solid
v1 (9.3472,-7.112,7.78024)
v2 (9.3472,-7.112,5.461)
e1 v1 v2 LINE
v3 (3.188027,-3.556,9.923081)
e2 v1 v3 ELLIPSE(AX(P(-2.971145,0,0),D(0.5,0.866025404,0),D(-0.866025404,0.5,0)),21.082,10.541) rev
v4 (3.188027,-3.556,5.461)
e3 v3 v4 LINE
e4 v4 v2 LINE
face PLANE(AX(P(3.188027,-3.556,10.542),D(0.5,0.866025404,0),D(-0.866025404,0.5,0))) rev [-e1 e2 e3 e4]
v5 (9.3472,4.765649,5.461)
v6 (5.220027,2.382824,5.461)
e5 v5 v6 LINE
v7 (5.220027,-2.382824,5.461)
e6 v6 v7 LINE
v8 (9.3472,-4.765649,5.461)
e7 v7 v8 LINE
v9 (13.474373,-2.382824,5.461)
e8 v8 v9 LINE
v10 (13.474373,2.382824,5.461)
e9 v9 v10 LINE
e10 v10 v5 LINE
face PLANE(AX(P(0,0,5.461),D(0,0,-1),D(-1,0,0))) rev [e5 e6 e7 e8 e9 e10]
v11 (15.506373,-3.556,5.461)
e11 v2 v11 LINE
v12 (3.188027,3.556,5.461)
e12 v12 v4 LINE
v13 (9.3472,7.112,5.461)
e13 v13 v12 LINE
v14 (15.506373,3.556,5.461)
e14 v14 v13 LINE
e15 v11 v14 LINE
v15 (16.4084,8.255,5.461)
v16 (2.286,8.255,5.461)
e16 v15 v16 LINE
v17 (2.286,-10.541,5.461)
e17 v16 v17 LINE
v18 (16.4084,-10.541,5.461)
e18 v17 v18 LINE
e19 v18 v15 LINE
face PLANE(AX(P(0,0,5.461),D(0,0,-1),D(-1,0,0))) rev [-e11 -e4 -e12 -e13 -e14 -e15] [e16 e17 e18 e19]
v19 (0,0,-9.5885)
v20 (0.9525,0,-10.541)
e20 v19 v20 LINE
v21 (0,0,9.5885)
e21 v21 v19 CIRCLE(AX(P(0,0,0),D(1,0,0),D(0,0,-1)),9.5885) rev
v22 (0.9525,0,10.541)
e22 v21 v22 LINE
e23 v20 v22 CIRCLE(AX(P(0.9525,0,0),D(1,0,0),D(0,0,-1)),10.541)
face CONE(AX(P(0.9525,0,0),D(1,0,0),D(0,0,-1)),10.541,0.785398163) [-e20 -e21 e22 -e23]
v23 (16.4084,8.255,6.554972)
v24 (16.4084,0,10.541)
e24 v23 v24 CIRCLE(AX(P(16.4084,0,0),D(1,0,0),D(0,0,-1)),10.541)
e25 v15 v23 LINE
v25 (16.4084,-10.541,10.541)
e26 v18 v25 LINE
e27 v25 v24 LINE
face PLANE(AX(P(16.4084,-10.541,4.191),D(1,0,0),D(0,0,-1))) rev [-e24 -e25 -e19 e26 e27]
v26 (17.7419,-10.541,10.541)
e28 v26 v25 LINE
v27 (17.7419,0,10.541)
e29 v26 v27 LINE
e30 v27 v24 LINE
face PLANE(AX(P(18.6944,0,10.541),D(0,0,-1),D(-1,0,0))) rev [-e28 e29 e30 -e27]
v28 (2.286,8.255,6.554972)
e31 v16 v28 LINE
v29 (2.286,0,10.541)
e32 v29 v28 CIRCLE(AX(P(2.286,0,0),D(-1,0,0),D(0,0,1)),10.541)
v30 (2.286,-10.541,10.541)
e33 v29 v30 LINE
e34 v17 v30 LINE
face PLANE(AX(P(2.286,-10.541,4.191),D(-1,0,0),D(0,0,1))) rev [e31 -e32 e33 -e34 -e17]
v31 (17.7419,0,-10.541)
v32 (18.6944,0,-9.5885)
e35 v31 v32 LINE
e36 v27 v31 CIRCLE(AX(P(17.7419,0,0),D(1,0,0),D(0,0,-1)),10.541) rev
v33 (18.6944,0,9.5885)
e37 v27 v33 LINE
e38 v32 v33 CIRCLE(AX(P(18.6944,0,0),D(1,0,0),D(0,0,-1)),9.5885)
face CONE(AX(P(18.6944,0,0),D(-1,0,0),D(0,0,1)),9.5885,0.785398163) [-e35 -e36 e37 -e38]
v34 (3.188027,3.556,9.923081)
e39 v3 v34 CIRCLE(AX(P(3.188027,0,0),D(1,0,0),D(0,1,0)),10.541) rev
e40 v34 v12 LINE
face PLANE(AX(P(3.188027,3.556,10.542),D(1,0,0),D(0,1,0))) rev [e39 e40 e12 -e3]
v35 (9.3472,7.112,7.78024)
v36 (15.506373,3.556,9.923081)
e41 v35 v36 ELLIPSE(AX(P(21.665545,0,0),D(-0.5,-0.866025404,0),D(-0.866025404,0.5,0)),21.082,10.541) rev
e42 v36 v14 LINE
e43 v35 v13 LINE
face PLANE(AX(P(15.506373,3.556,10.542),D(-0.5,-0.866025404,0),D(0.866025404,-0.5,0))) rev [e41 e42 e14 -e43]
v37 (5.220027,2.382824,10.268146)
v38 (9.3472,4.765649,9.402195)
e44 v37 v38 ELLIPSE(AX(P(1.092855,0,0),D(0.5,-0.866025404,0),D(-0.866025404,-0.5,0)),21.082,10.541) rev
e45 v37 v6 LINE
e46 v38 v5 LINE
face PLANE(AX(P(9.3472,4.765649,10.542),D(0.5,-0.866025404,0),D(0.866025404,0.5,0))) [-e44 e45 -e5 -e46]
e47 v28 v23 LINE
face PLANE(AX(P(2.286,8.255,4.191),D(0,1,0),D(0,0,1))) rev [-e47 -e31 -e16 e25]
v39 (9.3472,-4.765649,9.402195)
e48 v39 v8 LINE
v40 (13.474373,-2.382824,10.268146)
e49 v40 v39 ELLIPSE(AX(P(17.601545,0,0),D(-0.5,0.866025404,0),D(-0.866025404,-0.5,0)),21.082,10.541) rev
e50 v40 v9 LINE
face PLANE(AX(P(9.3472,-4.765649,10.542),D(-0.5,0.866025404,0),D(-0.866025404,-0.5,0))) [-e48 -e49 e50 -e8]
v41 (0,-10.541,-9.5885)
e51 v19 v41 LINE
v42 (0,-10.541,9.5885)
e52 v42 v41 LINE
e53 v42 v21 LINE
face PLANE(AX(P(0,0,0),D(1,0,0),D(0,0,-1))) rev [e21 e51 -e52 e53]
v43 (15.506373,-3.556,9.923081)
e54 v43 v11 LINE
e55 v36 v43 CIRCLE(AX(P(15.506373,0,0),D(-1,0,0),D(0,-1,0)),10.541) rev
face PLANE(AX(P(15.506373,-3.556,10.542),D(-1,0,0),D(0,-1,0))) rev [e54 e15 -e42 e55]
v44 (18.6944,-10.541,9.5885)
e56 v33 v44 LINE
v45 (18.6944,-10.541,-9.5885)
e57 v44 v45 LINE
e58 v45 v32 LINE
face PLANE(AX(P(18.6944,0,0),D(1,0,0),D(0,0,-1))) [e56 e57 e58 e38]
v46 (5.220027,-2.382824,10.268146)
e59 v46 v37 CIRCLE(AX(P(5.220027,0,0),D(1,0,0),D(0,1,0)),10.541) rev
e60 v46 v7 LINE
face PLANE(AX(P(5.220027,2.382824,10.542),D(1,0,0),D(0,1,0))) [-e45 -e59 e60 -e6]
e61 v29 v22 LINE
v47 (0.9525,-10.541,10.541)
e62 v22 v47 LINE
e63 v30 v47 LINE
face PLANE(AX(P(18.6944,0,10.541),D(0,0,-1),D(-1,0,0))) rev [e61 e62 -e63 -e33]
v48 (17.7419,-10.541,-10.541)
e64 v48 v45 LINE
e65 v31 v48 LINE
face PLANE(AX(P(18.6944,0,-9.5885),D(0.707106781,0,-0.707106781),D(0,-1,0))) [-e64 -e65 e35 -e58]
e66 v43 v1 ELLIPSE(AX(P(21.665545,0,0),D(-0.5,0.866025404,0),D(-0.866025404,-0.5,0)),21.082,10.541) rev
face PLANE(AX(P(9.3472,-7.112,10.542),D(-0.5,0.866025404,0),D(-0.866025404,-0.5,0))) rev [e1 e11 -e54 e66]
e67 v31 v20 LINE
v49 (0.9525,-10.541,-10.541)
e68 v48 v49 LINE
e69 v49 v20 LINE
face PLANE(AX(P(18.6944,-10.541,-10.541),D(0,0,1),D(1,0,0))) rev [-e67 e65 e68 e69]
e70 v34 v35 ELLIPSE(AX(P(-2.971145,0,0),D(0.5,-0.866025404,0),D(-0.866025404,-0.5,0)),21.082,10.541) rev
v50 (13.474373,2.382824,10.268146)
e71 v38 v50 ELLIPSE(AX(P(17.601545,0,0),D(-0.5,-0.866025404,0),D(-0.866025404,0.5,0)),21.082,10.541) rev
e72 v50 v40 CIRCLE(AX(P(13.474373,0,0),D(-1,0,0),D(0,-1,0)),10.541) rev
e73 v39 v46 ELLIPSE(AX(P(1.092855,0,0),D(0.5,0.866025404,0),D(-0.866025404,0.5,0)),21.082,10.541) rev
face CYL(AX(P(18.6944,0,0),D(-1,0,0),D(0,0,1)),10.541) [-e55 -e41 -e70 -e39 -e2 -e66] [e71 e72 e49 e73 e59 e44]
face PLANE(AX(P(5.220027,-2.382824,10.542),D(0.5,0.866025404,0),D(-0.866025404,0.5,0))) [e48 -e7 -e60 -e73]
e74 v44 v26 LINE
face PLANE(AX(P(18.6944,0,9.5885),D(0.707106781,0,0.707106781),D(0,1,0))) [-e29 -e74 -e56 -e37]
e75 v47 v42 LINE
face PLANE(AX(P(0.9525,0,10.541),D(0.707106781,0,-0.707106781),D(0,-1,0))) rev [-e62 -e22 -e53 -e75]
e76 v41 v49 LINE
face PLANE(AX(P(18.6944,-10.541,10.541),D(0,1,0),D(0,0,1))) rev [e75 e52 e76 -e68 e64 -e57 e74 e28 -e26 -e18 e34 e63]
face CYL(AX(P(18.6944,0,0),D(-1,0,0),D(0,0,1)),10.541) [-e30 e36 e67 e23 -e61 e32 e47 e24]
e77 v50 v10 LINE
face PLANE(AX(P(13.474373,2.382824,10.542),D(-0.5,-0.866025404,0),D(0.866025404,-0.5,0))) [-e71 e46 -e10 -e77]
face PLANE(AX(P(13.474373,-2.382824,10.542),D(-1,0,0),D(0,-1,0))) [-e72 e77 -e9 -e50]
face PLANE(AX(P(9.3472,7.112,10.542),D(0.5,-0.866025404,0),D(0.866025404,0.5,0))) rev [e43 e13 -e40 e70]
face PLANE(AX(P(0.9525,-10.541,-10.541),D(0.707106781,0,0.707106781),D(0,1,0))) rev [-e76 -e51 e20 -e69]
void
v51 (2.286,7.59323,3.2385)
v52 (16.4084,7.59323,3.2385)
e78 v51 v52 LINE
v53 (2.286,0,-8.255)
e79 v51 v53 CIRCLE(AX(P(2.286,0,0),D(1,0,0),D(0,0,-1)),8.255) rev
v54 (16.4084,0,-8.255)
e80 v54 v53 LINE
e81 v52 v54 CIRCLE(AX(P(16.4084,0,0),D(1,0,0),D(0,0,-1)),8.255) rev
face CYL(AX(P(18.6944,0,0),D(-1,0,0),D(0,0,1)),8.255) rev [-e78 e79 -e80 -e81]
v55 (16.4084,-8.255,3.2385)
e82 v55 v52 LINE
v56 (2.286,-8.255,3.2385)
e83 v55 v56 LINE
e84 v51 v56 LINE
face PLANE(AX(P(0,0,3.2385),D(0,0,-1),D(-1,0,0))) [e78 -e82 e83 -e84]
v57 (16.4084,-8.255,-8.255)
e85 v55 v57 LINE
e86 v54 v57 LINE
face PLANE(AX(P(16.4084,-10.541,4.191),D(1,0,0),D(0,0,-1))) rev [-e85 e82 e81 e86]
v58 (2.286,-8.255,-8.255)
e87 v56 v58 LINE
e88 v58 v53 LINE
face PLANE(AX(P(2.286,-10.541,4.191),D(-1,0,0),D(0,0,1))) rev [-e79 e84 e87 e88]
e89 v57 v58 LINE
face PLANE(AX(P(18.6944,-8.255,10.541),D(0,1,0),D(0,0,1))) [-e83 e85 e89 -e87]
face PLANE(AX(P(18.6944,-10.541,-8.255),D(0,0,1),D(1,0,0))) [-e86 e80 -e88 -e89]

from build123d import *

# Parameters (mm, degrees)
BOSS_EXTRUDE1_DEPTH      = 18.6944
CHAMFER1_SIZE            = 0.9525
SKETCH2_W                = 14.1224
SKETCH2_H                = 18.796
CUT_EXTRUDE1_DEPTH       = 6.35
SHELL2_START             = 2.286
SHELL2_DEPTH             = 14.1224
BOSS_EXTRUDE3_REACH      = 28.031
BOSS_EXTRUDE3_END_RADIUS = 10.541
BOSS_EXTRUDE4_DEPTH      = 1.27
BOSS_EXTRUDE4_DEPTH_BACK = 0.9525
SKETCH4_W                = 14.473113765
SKETCH4_H                = 19.407327032


# Read off the part's stored shape, not the designer's step: Shell2
with BuildPart() as part:
    # Sketch1 → Boss-Extrude1 (new body)
    with BuildSketch(Plane(origin=(0, 0, 0), x_dir=(0, 0, -1), z_dir=(1, 0, 0))):
        with BuildLine():
            Line((-10.541, 0), (-10.541, -10.541))
            Line((-10.541, -10.541), (10.541, -10.541))
            Line((10.541, -10.541), (10.541, 0))
            ThreePointArc((10.541, 0), (0, 10.541), (-10.541, 0))
        make_face()
    extrude(amount=BOSS_EXTRUDE1_DEPTH)

    # Chamfer1
    chamfer1_edges = [part.edges().sort_by_distance(p)[0] for p in [
        (18.6944, -5.2705, 10.541),
        (18.6944, -5.2705, -10.541),
        (0, -5.2705, 10.541),
        (0, 10.541, 0),
        (0, -5.2705, -10.541),
        (18.6944, 10.541, 0),
    ]]
    chamfer(chamfer1_edges, length=CHAMFER1_SIZE)

    # Sketch2 → Cut-Extrude1 (cut)
    with BuildSketch(Plane.XY.offset(10.541)):
        with Locations((9.3472, -1.143)):
            Rectangle(SKETCH2_W, SKETCH2_H)
    extrude(amount=-CUT_EXTRUDE1_DEPTH, mode=Mode.SUBTRACT)

    # Shell2 outline → Shell2 (cut)
    with BuildSketch(Plane.YZ.offset(SHELL2_START)):
        with BuildLine():
            ThreePointArc((0, -8.255), (7.167347138, -4.095626936), (7.112, 4.191))
            Line((7.112, 4.191), (-8.255, 4.191))
            Line((-8.255, 4.191), (-8.255, -8.255))
            Line((-8.255, -8.255), (0, -8.255))
        make_face()
    extrude(amount=SHELL2_DEPTH, mode=Mode.SUBTRACT)



with BuildPart() as body_2:
    # Boss-Extrude3: up to this cylinder (the profile starts inside it)
    boss_extrude3_end = Plane(origin=(6.361697, 0, 0), z_dir=(-1, 0, 0)) * Cylinder(BOSS_EXTRUDE3_END_RADIUS, 78.144, mode=Mode.PRIVATE)
    # Sketch3 → Boss-Extrude3 (new, up to the surface)
    with BuildSketch(Plane.XY.offset(4.191), mode=Mode.PRIVATE) as boss_extrude3_sk1:
        Polygon((9.3472, 7.112), (3.188027328, 3.556), (3.188027328, -3.556), (9.3472, -7.112), (15.506372672, -3.556), (15.506372672, 3.556), align=None)
        Polygon((9.3472, 4.765648506), (5.220027328, 2.382824253), (5.220027328, -2.382824253), (9.3472, -4.765648506), (13.474372672, -2.382824253), (13.474372672, 2.382824253), align=None, mode=Mode.SUBTRACT)
    boss_extrude3_tool1 = extrude(boss_extrude3_sk1.sketch, amount=BOSS_EXTRUDE3_REACH, mode=Mode.PRIVATE) & boss_extrude3_end
    add(boss_extrude3_tool1.solids().sort_by_distance((6.361697, 5.171044, 4.191))[0])


with BuildPart() as part_1:
    add(part.part)

    add(body_2.part)  # Boss-Extrude4 merges body 2
    # Sketch4 → Boss-Extrude4 (add, two sides: drawn at the far end of the back side and taken through both)
    with BuildSketch(Plane.XY.offset(4.191).offset(-BOSS_EXTRUDE4_DEPTH_BACK)):
        with Locations((9.522556883, -0.837336484)):
            Rectangle(SKETCH4_W, SKETCH4_H)
    extrude(amount=BOSS_EXTRUDE4_DEPTH + BOSS_EXTRUDE4_DEPTH_BACK)


solid = part_1.part
